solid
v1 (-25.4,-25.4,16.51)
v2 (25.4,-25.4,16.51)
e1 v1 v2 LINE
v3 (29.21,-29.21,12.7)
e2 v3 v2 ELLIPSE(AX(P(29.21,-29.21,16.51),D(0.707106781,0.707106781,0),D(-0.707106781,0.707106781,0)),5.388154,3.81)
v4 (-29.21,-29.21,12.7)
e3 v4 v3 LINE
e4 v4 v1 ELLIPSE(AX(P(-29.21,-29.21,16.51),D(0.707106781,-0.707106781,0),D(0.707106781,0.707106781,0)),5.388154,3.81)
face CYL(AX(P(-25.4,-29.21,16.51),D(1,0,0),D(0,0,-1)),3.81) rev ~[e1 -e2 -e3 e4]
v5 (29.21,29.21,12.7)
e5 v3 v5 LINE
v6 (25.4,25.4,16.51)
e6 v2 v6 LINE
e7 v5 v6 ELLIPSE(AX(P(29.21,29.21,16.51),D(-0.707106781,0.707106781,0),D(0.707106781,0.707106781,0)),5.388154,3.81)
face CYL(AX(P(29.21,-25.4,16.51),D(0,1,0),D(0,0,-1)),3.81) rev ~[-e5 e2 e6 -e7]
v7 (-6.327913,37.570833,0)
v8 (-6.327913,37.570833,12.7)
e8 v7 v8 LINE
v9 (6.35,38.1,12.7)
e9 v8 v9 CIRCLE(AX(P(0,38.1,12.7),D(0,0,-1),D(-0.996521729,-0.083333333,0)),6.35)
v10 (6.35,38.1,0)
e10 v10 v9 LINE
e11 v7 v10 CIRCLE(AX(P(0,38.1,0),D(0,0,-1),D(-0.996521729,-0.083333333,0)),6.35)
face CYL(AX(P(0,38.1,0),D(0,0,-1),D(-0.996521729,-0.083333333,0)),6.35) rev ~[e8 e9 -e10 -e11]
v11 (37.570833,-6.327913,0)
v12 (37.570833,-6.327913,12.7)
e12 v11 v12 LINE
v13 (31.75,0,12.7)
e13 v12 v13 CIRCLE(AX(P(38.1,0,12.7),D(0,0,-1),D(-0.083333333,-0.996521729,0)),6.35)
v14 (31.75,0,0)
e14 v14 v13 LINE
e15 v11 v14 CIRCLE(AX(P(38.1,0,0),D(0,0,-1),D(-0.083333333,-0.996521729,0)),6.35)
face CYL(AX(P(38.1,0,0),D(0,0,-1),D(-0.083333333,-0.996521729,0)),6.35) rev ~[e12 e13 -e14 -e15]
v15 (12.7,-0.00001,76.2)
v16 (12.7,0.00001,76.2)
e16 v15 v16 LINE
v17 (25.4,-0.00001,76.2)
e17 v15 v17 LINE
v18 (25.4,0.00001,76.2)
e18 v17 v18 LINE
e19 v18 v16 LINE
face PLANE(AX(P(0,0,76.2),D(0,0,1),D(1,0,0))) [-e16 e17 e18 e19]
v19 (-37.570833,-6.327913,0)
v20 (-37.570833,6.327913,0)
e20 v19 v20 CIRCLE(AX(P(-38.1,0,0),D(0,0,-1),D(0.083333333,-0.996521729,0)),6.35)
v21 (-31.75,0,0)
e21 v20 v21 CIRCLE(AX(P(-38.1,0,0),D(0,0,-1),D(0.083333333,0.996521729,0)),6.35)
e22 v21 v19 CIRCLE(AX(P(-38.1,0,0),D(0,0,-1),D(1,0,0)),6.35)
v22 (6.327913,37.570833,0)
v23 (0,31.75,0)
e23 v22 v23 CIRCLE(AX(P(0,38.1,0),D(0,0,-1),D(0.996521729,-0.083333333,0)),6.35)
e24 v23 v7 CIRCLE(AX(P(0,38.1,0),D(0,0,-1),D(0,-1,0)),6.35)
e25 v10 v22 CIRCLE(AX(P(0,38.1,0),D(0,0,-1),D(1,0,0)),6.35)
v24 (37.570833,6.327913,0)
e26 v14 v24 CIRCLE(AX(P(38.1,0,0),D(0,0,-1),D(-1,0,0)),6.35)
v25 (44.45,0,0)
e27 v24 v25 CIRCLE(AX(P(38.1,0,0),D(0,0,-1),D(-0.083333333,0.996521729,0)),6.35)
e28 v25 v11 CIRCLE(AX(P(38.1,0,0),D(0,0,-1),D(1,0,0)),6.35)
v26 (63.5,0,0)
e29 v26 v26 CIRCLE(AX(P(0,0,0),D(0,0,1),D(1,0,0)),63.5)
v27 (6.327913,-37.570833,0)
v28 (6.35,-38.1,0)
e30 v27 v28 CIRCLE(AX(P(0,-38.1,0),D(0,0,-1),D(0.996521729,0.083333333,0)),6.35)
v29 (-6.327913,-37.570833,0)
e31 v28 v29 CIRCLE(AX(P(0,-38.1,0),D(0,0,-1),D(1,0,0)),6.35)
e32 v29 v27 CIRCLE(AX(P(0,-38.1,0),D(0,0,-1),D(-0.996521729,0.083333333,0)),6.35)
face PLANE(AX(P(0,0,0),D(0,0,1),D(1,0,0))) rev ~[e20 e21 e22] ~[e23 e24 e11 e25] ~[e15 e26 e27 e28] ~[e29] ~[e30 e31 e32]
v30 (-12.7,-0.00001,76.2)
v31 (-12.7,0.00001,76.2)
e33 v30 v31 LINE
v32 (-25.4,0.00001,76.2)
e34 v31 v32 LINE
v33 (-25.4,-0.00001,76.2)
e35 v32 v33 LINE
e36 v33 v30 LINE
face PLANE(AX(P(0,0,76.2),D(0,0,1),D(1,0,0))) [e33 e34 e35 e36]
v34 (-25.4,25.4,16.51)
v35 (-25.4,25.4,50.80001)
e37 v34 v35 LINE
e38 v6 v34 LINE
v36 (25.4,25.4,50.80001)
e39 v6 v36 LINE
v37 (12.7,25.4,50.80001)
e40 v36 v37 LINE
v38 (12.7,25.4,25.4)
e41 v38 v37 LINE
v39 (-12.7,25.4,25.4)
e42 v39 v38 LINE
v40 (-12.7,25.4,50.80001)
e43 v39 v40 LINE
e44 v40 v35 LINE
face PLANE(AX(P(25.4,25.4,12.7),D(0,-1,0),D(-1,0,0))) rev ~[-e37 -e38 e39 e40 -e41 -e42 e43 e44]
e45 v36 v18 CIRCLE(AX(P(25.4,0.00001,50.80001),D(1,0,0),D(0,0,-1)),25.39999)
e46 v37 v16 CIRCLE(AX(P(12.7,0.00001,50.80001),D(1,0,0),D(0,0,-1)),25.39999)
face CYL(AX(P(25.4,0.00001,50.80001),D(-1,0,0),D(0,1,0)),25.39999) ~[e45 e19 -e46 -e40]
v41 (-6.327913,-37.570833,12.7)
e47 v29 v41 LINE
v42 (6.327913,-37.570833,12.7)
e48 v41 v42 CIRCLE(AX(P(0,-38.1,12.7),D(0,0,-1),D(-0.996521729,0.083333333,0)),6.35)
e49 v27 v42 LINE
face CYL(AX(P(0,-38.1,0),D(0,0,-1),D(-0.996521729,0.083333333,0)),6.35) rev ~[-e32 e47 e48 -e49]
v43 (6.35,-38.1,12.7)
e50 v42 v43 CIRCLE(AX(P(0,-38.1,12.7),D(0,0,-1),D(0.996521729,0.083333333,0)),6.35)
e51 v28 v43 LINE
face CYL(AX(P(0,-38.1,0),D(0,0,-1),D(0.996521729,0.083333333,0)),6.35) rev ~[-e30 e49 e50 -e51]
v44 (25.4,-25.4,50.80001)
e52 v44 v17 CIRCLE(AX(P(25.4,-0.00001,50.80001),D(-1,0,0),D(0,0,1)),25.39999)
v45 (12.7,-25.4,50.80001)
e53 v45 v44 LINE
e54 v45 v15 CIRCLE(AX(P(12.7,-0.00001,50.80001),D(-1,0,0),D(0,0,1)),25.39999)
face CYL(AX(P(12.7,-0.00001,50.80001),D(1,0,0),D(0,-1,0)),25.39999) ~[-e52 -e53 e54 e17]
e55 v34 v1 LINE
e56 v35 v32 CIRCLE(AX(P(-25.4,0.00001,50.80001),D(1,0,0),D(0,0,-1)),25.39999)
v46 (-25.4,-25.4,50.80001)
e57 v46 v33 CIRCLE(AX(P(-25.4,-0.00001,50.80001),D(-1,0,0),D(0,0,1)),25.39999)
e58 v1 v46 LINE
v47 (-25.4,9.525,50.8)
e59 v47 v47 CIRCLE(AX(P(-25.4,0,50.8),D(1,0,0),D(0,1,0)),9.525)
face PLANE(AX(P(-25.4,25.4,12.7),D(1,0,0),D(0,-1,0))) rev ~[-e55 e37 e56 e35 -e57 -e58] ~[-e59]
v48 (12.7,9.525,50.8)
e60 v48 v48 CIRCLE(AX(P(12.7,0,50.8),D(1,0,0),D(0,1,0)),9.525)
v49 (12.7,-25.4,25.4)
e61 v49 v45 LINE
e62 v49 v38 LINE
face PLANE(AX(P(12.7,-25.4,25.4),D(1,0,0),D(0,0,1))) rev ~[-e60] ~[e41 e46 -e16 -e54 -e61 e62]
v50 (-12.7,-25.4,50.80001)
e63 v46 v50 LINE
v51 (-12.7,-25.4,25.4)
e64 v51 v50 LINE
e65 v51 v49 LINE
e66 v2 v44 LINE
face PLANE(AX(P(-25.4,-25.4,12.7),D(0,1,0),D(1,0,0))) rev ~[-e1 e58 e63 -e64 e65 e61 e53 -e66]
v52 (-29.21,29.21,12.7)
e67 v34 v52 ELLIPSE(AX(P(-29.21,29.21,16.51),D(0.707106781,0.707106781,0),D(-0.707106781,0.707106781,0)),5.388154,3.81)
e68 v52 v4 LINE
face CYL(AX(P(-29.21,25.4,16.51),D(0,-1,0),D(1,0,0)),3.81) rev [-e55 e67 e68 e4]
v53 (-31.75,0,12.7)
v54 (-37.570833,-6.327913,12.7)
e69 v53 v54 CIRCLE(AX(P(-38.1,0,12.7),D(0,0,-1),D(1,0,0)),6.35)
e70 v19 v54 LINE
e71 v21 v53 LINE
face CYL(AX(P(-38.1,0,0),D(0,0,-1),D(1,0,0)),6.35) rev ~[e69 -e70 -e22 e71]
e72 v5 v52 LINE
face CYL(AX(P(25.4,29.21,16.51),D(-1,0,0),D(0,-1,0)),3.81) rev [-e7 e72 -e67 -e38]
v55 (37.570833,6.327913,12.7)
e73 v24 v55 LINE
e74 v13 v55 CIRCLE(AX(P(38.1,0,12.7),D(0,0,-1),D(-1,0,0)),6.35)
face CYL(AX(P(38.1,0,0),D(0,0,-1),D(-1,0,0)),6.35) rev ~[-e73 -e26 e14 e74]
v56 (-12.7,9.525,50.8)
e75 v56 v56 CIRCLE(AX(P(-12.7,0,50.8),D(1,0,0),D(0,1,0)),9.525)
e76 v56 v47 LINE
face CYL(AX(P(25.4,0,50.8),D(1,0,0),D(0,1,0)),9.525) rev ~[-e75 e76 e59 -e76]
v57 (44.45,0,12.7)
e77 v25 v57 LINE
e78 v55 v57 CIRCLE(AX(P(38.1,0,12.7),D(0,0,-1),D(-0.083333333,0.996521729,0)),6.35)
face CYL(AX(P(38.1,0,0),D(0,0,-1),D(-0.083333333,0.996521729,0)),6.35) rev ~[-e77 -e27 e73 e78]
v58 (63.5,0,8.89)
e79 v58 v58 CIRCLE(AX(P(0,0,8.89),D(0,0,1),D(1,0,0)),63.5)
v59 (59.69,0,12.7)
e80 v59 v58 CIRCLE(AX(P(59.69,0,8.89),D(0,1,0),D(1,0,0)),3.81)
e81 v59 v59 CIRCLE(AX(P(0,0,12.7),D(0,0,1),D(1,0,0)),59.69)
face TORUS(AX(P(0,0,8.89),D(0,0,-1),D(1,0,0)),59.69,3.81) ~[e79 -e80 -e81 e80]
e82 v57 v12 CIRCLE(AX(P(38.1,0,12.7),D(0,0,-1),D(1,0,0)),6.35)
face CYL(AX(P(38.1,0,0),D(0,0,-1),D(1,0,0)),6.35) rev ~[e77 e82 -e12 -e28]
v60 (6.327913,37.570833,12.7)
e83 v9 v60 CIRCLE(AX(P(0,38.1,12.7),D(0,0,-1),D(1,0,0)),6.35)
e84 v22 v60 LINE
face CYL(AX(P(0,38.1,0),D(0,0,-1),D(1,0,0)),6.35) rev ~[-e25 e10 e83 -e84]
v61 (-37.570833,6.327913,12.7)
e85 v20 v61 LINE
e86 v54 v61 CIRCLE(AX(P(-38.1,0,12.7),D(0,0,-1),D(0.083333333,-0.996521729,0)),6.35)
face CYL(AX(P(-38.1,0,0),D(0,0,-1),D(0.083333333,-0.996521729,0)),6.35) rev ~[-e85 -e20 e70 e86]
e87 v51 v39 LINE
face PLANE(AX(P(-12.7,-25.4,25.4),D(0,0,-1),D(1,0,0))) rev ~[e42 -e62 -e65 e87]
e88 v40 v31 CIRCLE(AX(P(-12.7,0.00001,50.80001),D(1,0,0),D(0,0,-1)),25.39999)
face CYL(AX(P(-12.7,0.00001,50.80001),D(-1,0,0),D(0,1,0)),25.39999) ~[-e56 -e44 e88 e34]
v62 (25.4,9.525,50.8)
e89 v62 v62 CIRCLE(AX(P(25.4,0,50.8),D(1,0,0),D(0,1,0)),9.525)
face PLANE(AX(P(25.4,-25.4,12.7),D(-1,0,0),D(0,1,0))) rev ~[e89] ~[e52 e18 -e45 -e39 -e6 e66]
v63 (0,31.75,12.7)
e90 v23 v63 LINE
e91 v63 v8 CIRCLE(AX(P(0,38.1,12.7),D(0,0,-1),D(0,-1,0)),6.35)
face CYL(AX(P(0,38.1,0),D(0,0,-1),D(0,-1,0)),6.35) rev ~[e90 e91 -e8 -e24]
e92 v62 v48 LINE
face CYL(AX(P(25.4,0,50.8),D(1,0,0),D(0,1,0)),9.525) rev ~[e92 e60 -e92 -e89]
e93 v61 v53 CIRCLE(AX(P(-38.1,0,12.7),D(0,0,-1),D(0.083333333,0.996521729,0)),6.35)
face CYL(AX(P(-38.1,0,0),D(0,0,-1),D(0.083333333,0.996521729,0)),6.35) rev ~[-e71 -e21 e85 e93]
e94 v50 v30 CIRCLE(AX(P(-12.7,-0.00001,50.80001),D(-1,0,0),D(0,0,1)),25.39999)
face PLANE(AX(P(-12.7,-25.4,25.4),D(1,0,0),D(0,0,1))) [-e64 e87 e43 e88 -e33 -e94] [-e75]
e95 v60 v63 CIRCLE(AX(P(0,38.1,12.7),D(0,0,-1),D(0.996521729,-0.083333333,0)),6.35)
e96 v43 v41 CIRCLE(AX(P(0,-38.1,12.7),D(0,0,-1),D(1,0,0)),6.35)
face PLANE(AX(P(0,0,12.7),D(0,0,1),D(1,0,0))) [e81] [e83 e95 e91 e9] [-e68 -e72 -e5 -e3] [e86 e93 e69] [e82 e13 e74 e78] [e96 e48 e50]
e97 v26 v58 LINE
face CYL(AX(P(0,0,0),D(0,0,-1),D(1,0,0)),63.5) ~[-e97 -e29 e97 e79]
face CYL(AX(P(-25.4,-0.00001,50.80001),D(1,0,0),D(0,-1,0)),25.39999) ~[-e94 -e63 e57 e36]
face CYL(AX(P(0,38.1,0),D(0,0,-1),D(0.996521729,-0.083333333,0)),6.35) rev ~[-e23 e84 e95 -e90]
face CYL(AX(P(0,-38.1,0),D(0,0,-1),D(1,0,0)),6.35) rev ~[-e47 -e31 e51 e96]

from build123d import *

# Parameters (mm, degrees)
F0_R     = 63.5
F1_DEPTH = 12.7
F3_DEPTH = 63.5
F4_W     = 25.4
F4_H     = 50.8
F5_DEPTH = 50.8
F7_DEPTH = 127
F8_R     = 25.39999
F9_R     = 3.81


# Not quite as in the source:
# - a fillet or chamfer is up to 0.001 mm smaller than in the source, because OpenCascade refuses the exact size


with BuildPart() as f1:
    # F0 (on Top) → F1 (new body)
    with BuildSketch(Plane.XY):
        Circle(F0_R)
        with BuildLine():
            ThreePointArc((6.3279129766, -37.5708333333), (6.3444758413, -37.835186293), (6.35, -38.1))
            ThreePointArc((6.35, -38.1), (-0.264813707, -44.4444758413), (-6.3279129766, -37.5708333333))
            ThreePointArc((-6.3279129766, -37.5708333333), (0, -31.75), (6.3279129766, -37.5708333333))
        make_face(mode=Mode.SUBTRACT)
        with BuildLine():
            ThreePointArc((-37.5708333333, 6.3279129766), (-33.4265265416, 4.2989703225), (-31.75, 0))
            ThreePointArc((-31.75, 0), (-33.4265265416, -4.2989703225), (-37.5708333333, -6.3279129766))
            ThreePointArc((-37.5708333333, -6.3279129766), (-44.45, 0), (-37.5708333333, 6.3279129766))
        make_face(mode=Mode.SUBTRACT)
        with BuildLine():
            ThreePointArc((37.5708333333, -6.3279129766), (33.4265265416, -4.2989703225), (31.75, 0))
            ThreePointArc((31.75, 0), (33.4265265416, 4.2989703225), (37.5708333333, 6.3279129766))
            ThreePointArc((37.5708333333, 6.3279129766), (42.3989703225, 4.6734734584), (44.45, 0))
            ThreePointArc((44.45, 0), (42.3989703225, -4.6734734584), (37.5708333333, -6.3279129766))
        make_face(mode=Mode.SUBTRACT)
        with BuildLine():
            ThreePointArc((6.35, 38.1), (6.3444758413, 37.835186293), (6.3279129766, 37.5708333333))
            ThreePointArc((6.3279129766, 37.5708333333), (4.2989703225, 33.4265265416), (0, 31.75))
            ThreePointArc((0, 31.75), (-4.2989703225, 33.4265265416), (-6.3279129766, 37.5708333333))
            ThreePointArc((-6.3279129766, 37.5708333333), (-0.264813707, 44.4444758413), (6.35, 38.1))
        make_face(mode=Mode.SUBTRACT)
    extrude(amount=F1_DEPTH)

    # F2 (on face) → F3 (join)
    with BuildSketch(Plane.XY.offset(12.7)):
        Polygon((25.4, 25.4), (0, 25.4), (-25.4, 25.4), (-25.4, -25.4), (25.4, -25.4), align=None)
    extrude(amount=F3_DEPTH)

    # F4 (on face) → F5 (cut)
    with BuildSketch(Plane.XZ.offset(25.4)):
        with Locations((0, 50.8)):
            Rectangle(F4_W, F4_H)
    extrude(amount=-F5_DEPTH, mode=Mode.SUBTRACT)

    # F6 (on face) → F7 (cut)
    with BuildSketch(Plane.YZ.offset(25.4)):
        with BuildLine():
            ThreePointArc((9.525, 50.8), (6.7351920908, 57.5351920908), (0, 60.325))
            Line((0, 60.325), (0, 50.8))
            Line((0, 50.8), (0, 41.275))
            ThreePointArc((0, 41.275), (6.7351920908, 44.0648079092), (9.525, 50.8))
        make_face()
        with BuildLine():
            Line((0, 50.8), (0, 60.325))
            ThreePointArc((0, 60.325), (-9.525, 50.8), (0, 41.275))
            Line((0, 41.275), (0, 50.8))
        make_face()
    extrude(amount=-F7_DEPTH, mode=Mode.SUBTRACT)

    # F8 (radius 25.4 in the source; OpenCascade refuses exactly that, so slightly less here)
    f8_edges = [f1.edges().sort_by_distance(p)[0] for p in [
        (19.05, -25.4, 76.2),
        (19.05, 25.4, 76.2),
        (-19.05, -25.4, 76.2),
        (-19.05, 25.4, 76.2),
    ]]
    fillet(f8_edges, radius=F8_R)

    # F9
    f9_edges = [f1.edges().sort_by_distance(p)[0] for p in [
        (-63.5, 0, 12.7),
        (25.4, 0, 12.7),
        (0, -25.4, 12.7),
        (0, 25.4, 12.7),
        (-25.4, 0, 12.7),
    ]]
    fillet(f9_edges, radius=F9_R)


solid = f1.part
